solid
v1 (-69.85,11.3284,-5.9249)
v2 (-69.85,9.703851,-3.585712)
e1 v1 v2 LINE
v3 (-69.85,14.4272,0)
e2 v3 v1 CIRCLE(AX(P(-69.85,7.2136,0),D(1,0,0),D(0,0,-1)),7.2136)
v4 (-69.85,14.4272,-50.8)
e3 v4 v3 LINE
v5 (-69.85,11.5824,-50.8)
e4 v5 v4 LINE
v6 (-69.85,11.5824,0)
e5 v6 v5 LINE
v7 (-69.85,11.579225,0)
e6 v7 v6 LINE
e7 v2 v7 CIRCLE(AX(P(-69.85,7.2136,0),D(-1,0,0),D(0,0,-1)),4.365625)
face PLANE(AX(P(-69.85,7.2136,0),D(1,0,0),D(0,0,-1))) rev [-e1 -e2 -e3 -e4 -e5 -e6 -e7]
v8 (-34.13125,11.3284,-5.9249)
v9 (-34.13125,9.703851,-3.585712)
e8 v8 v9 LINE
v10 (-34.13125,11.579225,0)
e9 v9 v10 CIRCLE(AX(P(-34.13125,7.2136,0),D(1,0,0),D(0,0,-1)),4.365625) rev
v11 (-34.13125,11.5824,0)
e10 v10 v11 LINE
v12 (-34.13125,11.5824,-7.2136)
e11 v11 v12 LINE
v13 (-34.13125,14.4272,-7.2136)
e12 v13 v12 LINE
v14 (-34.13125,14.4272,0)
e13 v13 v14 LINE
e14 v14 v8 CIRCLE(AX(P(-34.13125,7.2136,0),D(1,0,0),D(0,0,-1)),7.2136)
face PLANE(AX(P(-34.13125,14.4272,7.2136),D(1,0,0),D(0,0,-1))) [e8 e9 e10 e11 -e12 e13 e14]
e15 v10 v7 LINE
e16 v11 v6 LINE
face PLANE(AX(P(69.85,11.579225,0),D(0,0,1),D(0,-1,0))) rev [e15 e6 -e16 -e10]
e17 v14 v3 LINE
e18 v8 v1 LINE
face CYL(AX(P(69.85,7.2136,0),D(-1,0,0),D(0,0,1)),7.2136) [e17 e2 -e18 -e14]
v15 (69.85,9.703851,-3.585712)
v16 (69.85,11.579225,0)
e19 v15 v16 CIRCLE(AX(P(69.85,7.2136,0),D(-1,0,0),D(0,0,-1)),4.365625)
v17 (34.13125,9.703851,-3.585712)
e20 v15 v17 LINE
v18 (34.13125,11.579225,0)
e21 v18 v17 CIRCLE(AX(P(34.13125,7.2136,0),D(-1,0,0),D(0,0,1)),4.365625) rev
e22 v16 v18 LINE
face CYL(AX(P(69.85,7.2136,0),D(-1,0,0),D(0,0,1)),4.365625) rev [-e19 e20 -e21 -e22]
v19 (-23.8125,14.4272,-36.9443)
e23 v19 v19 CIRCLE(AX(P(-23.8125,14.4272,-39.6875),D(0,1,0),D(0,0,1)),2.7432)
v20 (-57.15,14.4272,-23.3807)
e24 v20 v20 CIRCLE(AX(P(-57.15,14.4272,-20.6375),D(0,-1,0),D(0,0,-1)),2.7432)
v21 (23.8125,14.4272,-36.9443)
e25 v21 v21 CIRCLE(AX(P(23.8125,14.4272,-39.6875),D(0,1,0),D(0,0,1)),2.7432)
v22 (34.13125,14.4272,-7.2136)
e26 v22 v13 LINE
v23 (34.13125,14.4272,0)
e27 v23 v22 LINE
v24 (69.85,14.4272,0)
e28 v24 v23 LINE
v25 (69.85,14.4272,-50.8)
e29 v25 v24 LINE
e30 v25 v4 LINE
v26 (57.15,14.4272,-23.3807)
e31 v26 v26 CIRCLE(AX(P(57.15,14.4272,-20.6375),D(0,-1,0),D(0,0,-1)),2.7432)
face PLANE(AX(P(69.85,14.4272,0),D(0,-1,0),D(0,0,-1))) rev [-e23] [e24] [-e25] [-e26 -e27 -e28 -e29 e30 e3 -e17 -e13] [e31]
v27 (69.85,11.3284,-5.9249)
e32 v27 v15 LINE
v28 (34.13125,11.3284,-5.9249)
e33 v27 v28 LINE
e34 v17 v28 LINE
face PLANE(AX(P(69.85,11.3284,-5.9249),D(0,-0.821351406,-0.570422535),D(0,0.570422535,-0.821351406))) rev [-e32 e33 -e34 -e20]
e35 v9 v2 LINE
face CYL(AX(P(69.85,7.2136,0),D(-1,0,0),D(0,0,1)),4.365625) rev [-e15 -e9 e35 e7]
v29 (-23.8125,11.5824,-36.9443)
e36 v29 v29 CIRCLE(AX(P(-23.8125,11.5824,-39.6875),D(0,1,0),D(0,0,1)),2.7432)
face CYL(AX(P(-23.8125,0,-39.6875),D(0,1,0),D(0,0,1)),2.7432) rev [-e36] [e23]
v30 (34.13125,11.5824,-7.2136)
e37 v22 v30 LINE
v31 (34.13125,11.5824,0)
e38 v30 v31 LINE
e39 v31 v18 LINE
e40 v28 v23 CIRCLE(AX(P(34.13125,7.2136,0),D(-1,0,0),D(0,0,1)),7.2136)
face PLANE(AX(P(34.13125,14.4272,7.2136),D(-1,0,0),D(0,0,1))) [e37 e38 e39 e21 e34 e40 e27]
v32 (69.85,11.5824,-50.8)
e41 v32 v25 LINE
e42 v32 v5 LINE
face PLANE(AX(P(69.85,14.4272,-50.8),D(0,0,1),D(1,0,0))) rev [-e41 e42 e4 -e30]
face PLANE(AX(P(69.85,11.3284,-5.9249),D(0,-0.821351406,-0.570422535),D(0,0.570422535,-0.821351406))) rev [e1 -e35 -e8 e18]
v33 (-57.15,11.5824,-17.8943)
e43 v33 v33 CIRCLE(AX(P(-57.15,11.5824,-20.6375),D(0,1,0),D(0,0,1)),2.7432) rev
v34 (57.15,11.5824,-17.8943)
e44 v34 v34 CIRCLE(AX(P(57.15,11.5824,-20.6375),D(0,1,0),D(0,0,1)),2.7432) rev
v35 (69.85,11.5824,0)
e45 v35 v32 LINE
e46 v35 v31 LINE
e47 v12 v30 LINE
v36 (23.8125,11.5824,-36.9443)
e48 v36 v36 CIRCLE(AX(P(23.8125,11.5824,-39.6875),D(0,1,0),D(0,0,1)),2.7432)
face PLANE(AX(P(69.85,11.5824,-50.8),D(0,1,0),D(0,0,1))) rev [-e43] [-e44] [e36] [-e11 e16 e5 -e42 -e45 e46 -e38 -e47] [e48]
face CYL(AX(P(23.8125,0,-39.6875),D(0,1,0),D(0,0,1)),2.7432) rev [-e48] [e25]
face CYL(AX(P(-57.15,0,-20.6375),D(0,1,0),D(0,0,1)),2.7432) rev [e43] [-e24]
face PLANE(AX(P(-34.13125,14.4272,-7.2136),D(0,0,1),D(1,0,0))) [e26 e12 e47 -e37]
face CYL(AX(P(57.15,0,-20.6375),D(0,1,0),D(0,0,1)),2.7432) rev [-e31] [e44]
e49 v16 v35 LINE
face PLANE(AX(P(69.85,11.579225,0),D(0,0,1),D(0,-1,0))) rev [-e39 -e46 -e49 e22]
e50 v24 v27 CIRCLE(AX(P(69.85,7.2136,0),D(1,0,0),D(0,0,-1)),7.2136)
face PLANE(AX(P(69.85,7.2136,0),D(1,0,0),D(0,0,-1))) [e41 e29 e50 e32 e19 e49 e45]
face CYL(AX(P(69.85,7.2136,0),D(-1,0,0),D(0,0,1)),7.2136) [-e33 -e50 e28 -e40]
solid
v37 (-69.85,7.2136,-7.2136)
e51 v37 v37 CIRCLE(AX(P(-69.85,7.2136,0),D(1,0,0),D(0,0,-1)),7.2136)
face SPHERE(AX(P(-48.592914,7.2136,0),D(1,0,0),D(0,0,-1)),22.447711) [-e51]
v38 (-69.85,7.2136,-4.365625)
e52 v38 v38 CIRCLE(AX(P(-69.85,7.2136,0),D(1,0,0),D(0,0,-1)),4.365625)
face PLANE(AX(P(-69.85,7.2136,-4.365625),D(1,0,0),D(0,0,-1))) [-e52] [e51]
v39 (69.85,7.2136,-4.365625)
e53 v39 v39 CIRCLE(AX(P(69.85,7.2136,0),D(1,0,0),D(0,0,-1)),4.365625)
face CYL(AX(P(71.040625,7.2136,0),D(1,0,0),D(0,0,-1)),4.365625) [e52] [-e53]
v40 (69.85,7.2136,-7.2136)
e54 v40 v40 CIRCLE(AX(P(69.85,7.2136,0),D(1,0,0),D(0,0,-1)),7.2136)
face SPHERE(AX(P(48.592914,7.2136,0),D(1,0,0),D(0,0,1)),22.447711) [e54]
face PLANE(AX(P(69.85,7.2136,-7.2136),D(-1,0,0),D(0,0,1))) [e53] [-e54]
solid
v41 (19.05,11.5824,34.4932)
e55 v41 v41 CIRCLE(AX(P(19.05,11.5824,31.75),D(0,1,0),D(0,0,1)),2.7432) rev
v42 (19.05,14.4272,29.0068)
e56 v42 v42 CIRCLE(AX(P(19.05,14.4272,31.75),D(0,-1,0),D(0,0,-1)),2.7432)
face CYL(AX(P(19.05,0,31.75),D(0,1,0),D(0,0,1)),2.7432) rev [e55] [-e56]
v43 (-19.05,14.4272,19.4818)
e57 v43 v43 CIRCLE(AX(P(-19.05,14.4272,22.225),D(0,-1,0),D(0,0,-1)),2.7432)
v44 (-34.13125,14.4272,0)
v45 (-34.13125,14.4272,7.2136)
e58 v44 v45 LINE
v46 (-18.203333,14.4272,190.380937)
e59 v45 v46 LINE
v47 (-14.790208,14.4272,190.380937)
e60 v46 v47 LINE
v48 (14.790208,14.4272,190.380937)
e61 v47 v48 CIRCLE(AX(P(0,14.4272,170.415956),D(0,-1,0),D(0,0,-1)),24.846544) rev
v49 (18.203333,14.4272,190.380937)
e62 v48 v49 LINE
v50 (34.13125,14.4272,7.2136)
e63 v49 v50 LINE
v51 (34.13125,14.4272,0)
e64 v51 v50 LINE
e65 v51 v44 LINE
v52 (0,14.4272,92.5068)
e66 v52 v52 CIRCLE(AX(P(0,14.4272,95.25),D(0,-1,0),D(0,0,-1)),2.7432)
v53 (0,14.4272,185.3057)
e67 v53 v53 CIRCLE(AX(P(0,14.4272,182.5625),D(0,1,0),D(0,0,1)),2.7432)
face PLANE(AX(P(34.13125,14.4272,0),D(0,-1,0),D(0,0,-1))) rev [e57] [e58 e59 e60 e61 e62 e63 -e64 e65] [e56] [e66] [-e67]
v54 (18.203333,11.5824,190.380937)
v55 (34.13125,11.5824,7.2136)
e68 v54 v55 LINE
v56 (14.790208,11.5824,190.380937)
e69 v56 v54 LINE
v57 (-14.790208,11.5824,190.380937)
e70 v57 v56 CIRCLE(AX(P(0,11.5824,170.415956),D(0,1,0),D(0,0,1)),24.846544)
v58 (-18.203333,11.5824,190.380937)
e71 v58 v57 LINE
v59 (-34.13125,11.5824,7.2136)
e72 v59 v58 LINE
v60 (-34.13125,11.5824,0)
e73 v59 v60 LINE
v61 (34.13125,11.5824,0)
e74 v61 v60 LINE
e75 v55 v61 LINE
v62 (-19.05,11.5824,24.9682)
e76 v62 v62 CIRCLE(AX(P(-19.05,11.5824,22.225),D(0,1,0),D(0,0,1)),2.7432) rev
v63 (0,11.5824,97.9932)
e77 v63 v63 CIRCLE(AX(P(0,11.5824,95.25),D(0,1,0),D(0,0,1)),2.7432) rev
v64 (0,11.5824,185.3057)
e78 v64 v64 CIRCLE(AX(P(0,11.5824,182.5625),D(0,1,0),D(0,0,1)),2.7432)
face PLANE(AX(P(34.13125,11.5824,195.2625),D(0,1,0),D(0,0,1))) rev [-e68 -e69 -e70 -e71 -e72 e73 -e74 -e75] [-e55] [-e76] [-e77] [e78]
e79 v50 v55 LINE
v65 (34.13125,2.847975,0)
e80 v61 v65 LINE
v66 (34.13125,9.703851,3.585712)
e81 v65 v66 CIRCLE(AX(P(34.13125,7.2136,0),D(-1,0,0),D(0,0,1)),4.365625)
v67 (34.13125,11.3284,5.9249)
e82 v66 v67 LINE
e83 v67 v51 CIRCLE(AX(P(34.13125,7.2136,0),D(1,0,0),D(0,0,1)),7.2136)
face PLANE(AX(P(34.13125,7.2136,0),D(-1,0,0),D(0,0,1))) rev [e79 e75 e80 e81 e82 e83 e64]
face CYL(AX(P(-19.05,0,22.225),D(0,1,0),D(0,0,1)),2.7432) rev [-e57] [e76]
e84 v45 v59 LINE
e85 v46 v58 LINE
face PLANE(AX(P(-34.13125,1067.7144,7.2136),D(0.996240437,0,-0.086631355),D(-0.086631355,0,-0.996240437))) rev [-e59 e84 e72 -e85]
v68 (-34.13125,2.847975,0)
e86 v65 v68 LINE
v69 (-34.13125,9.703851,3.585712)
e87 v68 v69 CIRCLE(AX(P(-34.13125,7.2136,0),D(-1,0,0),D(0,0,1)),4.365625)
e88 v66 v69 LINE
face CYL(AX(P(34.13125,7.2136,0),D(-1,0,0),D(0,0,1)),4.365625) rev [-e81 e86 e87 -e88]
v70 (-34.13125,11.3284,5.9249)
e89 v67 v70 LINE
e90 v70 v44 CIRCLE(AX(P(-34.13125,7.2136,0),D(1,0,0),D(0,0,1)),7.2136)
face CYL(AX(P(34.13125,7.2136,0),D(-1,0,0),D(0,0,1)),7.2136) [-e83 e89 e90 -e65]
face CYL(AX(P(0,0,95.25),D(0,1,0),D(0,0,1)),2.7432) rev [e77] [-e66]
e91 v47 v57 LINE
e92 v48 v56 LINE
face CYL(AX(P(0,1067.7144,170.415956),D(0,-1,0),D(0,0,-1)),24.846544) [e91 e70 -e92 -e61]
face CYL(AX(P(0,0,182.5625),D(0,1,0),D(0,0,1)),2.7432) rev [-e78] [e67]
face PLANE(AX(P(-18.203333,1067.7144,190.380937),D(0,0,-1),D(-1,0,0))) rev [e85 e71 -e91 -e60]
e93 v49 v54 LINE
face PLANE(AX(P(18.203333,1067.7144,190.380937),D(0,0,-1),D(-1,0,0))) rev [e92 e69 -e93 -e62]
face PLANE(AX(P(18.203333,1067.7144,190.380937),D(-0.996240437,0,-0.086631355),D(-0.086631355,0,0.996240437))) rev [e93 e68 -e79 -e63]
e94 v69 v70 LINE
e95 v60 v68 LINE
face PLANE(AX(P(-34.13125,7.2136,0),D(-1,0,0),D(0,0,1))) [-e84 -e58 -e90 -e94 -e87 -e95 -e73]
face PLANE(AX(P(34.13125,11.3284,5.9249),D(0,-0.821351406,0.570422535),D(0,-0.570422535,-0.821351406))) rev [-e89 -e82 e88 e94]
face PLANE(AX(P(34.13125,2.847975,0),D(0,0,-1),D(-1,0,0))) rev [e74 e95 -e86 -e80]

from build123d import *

# Parameters (mm, degrees)
EXTRUDE1_DEPTH        = 34.13125
EXTRUDE2_DEPTH        = 69.85
SKETCH6_W             = 68.2625
SKETCH6_H             = 14.4272
CUT_EXTRUDE3_DEPTH    = 208.881241352
CUT_EXTRUDE4_DEPTH    = 1056.132
A24_HOLES_R           = 2.7432
A24_HOLE_CUT_DEPTH    = 209.284321077
SKETCH10_R            = 2.7432
EXTRUDE3_DEPTH        = 209.284321077
SKETCH12_R            = 2.7432
EXTRUDE5_DEPTH        = 209.284321077
DELETEFACE1_START     = 11.5824
DELETEFACE1_OUTLINE_R = 2.7432
DELETEFACE1_DEPTH     = 2.8448


# Read off the part's stored shape, not the designer's step: DeleteFace1
with BuildPart() as part:
    # Sketch2 → Extrude1 (new, symmetric)
    with BuildSketch(Plane(origin=(0, 0, 0), x_dir=(0, 0, -1), z_dir=(1, 0, 0))):
        with BuildLine():
            Line((0, 14.4272), (-195.2625, 14.4272))
            Line((-195.2625, 14.4272), (-195.2625, 11.5824))
            Line((-195.2625, 11.5824), (0, 11.5824))
            Line((0, 11.5824), (0, 2.847975))
            ThreePointArc((0, 2.847975), (-3.868474062, 5.190337765), (-3.58571223, 9.70385088))
            Line((-3.58571223, 9.70385088), (-5.924900499, 11.3284))
            ThreePointArc((-5.924900499, 11.3284), (3.343164944, 0.821474131), (0, 14.4272))
        make_face()
    extrude(amount=EXTRUDE1_DEPTH, both=True)

    # Sketch8 → Cut-Extrude4 (cut)
    with BuildSketch(Plane.XZ.offset(-11.5824)):
        with BuildLine():
            Line((-18.203333333, 190.3809375), (-14.790208333, 190.3809375))
            ThreePointArc((-14.790208333, 190.3809375), (0, 195.2625), (14.790208333, 190.3809375))
            Line((14.790208333, 190.3809375), (18.203333333, 190.3809375))
            Line((18.203333333, 190.3809375), (34.13125, 7.2136))
            Line((34.13125, 7.2136), (73.025, 7.2136))
            Line((73.025, 7.2136), (73.025, 220.6625))
            Line((73.025, 220.6625), (-73.025, 220.6625))
            Line((-73.025, 220.6625), (-73.025, 7.2136))
            Line((-73.025, 7.2136), (-34.13125, 7.2136))
            Line((-34.13125, 7.2136), (-18.203333333, 190.3809375))
        make_face()
    extrude(amount=-CUT_EXTRUDE4_DEPTH, mode=Mode.SUBTRACT)


with BuildPart() as body_2:
    # Sketch4 → Extrude2 (new, symmetric)
    with BuildSketch(Plane(origin=(0, 0, 0), x_dir=(0, 0, -1), z_dir=(1, 0, 0))):
        with BuildLine():
            Line((0, 14.4272), (50.8, 14.4272))
            Line((50.8, 14.4272), (50.8, 11.5824))
            Line((50.8, 11.5824), (0, 11.5824))
            Line((0, 11.5824), (0, 11.579225))
            ThreePointArc((0, 11.579225), (-2.023262235, 3.345125938), (3.58571223, 9.70385088))
            Line((3.58571223, 9.70385088), (5.924900499, 11.3284))
            ThreePointArc((5.924900499, 11.3284), (-3.343164944, 0.821474131), (0, 14.4272))
        make_face()
    extrude(amount=EXTRUDE2_DEPTH, both=True)

    # Sketch6 → Cut-Extrude3 (cut, through all)
    with BuildSketch(Plane(origin=(0, 0, 0), x_dir=(1, 0, 0), z_dir=(0, 1, 0))):
        Rectangle(SKETCH6_W, SKETCH6_H)
    extrude(amount=CUT_EXTRUDE3_DEPTH, mode=Mode.SUBTRACT)


with BuildPart() as body_3:
    # Sketch7 → Revolve1 (revolve)
    with BuildSketch(Plane(origin=(0, 7.2136, 0), x_dir=(-1, 0, 0), z_dir=(0, 1, 0))):
        with BuildLine():
            Line((-71.040625, 0), (71.040625, 0))
            ThreePointArc((71.040625, 0), (70.740968682, -3.655598886), (69.85, -7.2136))
            Line((69.85, -7.2136), (69.85, -4.365625))
            Line((69.85, -4.365625), (-69.85, -4.365625))
            Line((-69.85, -4.365625), (-69.85, -7.2136))
            ThreePointArc((-69.85, -7.2136), (-70.740968682, -3.655598886), (-71.040625, 0))
        make_face()
    revolve(axis=Axis((71.040625, 7.2136, 0), (-1, 0, 0)))


with BuildPart() as a24_hole_cut_tool:
    # a24 holes → A24 hole cut (new, through all)
    with BuildSketch(Plane.XZ.offset(-14.4272)):
        with Locations(Location((0, 95.25, 0), (0, 0, 90))):
            Circle(A24_HOLES_R)
        with Locations(Location((-19.05, 22.225, 0), (0, 0, 90))):
            Circle(A24_HOLES_R)
        with Locations(Location((19.05, 31.75, 0), (0, 0, 90))):
            Circle(A24_HOLES_R)
        with Locations(Location((0, -39.6875, 0), (0, 0, 90))):
            Circle(A24_HOLES_R)
        with Locations(Location((57.15, -20.6375, 0), (0, 0, 90))):
            Circle(A24_HOLES_R)
        with Locations(Location((-57.15, -20.6375, 0), (0, 0, 90))):
            Circle(A24_HOLES_R)
    extrude(amount=A24_HOLE_CUT_DEPTH)


with BuildPart() as part_1:
    add(part.part)

    # A24 hole cut: cut by a24_hole_cut_tool
    add(a24_hole_cut_tool.part, mode=Mode.SUBTRACT)

    # Sketch10 → Extrude3 (cut, through all)
    with BuildSketch(Plane(origin=(0, 14.4272, 0), x_dir=(1, 0, 0), z_dir=(0, 1, 0))):
        with Locations(Location((0, -182.5625, 0), (0, 0, 270))):
            Circle(SKETCH10_R)
    extrude(amount=-EXTRUDE3_DEPTH, mode=Mode.SUBTRACT)


with BuildPart() as body_2_1:
    add(body_2.part)

    # A24 hole cut: cut by a24_hole_cut_tool
    add(a24_hole_cut_tool.part, mode=Mode.SUBTRACT)

    # Sketch12 → Extrude5 (cut, through all)
    with BuildSketch(Plane(origin=(0, 14.4272, 0), x_dir=(1, 0, 0), z_dir=(0, 1, 0))):
        with Locations(Location((-23.8125, 39.6875, 0), (0, 0, 270))):
            Circle(SKETCH12_R)
        with Locations(Location((23.8125, 39.6875, 0), (0, 0, 270))):
            Circle(SKETCH12_R)
    extrude(amount=-EXTRUDE5_DEPTH, mode=Mode.SUBTRACT)

    # DeleteFace1 outline → DeleteFace1 (add)
    with BuildSketch(Plane(origin=(0, 0, 0), x_dir=(1, 0, 0), z_dir=(0, 1, 0)).offset(DELETEFACE1_START)):
        with Locations((0, 39.6875)):
            Circle(DELETEFACE1_OUTLINE_R)
    extrude(amount=DELETEFACE1_DEPTH)


solid = Compound([body_3.part, part_1.part, body_2_1.part])
